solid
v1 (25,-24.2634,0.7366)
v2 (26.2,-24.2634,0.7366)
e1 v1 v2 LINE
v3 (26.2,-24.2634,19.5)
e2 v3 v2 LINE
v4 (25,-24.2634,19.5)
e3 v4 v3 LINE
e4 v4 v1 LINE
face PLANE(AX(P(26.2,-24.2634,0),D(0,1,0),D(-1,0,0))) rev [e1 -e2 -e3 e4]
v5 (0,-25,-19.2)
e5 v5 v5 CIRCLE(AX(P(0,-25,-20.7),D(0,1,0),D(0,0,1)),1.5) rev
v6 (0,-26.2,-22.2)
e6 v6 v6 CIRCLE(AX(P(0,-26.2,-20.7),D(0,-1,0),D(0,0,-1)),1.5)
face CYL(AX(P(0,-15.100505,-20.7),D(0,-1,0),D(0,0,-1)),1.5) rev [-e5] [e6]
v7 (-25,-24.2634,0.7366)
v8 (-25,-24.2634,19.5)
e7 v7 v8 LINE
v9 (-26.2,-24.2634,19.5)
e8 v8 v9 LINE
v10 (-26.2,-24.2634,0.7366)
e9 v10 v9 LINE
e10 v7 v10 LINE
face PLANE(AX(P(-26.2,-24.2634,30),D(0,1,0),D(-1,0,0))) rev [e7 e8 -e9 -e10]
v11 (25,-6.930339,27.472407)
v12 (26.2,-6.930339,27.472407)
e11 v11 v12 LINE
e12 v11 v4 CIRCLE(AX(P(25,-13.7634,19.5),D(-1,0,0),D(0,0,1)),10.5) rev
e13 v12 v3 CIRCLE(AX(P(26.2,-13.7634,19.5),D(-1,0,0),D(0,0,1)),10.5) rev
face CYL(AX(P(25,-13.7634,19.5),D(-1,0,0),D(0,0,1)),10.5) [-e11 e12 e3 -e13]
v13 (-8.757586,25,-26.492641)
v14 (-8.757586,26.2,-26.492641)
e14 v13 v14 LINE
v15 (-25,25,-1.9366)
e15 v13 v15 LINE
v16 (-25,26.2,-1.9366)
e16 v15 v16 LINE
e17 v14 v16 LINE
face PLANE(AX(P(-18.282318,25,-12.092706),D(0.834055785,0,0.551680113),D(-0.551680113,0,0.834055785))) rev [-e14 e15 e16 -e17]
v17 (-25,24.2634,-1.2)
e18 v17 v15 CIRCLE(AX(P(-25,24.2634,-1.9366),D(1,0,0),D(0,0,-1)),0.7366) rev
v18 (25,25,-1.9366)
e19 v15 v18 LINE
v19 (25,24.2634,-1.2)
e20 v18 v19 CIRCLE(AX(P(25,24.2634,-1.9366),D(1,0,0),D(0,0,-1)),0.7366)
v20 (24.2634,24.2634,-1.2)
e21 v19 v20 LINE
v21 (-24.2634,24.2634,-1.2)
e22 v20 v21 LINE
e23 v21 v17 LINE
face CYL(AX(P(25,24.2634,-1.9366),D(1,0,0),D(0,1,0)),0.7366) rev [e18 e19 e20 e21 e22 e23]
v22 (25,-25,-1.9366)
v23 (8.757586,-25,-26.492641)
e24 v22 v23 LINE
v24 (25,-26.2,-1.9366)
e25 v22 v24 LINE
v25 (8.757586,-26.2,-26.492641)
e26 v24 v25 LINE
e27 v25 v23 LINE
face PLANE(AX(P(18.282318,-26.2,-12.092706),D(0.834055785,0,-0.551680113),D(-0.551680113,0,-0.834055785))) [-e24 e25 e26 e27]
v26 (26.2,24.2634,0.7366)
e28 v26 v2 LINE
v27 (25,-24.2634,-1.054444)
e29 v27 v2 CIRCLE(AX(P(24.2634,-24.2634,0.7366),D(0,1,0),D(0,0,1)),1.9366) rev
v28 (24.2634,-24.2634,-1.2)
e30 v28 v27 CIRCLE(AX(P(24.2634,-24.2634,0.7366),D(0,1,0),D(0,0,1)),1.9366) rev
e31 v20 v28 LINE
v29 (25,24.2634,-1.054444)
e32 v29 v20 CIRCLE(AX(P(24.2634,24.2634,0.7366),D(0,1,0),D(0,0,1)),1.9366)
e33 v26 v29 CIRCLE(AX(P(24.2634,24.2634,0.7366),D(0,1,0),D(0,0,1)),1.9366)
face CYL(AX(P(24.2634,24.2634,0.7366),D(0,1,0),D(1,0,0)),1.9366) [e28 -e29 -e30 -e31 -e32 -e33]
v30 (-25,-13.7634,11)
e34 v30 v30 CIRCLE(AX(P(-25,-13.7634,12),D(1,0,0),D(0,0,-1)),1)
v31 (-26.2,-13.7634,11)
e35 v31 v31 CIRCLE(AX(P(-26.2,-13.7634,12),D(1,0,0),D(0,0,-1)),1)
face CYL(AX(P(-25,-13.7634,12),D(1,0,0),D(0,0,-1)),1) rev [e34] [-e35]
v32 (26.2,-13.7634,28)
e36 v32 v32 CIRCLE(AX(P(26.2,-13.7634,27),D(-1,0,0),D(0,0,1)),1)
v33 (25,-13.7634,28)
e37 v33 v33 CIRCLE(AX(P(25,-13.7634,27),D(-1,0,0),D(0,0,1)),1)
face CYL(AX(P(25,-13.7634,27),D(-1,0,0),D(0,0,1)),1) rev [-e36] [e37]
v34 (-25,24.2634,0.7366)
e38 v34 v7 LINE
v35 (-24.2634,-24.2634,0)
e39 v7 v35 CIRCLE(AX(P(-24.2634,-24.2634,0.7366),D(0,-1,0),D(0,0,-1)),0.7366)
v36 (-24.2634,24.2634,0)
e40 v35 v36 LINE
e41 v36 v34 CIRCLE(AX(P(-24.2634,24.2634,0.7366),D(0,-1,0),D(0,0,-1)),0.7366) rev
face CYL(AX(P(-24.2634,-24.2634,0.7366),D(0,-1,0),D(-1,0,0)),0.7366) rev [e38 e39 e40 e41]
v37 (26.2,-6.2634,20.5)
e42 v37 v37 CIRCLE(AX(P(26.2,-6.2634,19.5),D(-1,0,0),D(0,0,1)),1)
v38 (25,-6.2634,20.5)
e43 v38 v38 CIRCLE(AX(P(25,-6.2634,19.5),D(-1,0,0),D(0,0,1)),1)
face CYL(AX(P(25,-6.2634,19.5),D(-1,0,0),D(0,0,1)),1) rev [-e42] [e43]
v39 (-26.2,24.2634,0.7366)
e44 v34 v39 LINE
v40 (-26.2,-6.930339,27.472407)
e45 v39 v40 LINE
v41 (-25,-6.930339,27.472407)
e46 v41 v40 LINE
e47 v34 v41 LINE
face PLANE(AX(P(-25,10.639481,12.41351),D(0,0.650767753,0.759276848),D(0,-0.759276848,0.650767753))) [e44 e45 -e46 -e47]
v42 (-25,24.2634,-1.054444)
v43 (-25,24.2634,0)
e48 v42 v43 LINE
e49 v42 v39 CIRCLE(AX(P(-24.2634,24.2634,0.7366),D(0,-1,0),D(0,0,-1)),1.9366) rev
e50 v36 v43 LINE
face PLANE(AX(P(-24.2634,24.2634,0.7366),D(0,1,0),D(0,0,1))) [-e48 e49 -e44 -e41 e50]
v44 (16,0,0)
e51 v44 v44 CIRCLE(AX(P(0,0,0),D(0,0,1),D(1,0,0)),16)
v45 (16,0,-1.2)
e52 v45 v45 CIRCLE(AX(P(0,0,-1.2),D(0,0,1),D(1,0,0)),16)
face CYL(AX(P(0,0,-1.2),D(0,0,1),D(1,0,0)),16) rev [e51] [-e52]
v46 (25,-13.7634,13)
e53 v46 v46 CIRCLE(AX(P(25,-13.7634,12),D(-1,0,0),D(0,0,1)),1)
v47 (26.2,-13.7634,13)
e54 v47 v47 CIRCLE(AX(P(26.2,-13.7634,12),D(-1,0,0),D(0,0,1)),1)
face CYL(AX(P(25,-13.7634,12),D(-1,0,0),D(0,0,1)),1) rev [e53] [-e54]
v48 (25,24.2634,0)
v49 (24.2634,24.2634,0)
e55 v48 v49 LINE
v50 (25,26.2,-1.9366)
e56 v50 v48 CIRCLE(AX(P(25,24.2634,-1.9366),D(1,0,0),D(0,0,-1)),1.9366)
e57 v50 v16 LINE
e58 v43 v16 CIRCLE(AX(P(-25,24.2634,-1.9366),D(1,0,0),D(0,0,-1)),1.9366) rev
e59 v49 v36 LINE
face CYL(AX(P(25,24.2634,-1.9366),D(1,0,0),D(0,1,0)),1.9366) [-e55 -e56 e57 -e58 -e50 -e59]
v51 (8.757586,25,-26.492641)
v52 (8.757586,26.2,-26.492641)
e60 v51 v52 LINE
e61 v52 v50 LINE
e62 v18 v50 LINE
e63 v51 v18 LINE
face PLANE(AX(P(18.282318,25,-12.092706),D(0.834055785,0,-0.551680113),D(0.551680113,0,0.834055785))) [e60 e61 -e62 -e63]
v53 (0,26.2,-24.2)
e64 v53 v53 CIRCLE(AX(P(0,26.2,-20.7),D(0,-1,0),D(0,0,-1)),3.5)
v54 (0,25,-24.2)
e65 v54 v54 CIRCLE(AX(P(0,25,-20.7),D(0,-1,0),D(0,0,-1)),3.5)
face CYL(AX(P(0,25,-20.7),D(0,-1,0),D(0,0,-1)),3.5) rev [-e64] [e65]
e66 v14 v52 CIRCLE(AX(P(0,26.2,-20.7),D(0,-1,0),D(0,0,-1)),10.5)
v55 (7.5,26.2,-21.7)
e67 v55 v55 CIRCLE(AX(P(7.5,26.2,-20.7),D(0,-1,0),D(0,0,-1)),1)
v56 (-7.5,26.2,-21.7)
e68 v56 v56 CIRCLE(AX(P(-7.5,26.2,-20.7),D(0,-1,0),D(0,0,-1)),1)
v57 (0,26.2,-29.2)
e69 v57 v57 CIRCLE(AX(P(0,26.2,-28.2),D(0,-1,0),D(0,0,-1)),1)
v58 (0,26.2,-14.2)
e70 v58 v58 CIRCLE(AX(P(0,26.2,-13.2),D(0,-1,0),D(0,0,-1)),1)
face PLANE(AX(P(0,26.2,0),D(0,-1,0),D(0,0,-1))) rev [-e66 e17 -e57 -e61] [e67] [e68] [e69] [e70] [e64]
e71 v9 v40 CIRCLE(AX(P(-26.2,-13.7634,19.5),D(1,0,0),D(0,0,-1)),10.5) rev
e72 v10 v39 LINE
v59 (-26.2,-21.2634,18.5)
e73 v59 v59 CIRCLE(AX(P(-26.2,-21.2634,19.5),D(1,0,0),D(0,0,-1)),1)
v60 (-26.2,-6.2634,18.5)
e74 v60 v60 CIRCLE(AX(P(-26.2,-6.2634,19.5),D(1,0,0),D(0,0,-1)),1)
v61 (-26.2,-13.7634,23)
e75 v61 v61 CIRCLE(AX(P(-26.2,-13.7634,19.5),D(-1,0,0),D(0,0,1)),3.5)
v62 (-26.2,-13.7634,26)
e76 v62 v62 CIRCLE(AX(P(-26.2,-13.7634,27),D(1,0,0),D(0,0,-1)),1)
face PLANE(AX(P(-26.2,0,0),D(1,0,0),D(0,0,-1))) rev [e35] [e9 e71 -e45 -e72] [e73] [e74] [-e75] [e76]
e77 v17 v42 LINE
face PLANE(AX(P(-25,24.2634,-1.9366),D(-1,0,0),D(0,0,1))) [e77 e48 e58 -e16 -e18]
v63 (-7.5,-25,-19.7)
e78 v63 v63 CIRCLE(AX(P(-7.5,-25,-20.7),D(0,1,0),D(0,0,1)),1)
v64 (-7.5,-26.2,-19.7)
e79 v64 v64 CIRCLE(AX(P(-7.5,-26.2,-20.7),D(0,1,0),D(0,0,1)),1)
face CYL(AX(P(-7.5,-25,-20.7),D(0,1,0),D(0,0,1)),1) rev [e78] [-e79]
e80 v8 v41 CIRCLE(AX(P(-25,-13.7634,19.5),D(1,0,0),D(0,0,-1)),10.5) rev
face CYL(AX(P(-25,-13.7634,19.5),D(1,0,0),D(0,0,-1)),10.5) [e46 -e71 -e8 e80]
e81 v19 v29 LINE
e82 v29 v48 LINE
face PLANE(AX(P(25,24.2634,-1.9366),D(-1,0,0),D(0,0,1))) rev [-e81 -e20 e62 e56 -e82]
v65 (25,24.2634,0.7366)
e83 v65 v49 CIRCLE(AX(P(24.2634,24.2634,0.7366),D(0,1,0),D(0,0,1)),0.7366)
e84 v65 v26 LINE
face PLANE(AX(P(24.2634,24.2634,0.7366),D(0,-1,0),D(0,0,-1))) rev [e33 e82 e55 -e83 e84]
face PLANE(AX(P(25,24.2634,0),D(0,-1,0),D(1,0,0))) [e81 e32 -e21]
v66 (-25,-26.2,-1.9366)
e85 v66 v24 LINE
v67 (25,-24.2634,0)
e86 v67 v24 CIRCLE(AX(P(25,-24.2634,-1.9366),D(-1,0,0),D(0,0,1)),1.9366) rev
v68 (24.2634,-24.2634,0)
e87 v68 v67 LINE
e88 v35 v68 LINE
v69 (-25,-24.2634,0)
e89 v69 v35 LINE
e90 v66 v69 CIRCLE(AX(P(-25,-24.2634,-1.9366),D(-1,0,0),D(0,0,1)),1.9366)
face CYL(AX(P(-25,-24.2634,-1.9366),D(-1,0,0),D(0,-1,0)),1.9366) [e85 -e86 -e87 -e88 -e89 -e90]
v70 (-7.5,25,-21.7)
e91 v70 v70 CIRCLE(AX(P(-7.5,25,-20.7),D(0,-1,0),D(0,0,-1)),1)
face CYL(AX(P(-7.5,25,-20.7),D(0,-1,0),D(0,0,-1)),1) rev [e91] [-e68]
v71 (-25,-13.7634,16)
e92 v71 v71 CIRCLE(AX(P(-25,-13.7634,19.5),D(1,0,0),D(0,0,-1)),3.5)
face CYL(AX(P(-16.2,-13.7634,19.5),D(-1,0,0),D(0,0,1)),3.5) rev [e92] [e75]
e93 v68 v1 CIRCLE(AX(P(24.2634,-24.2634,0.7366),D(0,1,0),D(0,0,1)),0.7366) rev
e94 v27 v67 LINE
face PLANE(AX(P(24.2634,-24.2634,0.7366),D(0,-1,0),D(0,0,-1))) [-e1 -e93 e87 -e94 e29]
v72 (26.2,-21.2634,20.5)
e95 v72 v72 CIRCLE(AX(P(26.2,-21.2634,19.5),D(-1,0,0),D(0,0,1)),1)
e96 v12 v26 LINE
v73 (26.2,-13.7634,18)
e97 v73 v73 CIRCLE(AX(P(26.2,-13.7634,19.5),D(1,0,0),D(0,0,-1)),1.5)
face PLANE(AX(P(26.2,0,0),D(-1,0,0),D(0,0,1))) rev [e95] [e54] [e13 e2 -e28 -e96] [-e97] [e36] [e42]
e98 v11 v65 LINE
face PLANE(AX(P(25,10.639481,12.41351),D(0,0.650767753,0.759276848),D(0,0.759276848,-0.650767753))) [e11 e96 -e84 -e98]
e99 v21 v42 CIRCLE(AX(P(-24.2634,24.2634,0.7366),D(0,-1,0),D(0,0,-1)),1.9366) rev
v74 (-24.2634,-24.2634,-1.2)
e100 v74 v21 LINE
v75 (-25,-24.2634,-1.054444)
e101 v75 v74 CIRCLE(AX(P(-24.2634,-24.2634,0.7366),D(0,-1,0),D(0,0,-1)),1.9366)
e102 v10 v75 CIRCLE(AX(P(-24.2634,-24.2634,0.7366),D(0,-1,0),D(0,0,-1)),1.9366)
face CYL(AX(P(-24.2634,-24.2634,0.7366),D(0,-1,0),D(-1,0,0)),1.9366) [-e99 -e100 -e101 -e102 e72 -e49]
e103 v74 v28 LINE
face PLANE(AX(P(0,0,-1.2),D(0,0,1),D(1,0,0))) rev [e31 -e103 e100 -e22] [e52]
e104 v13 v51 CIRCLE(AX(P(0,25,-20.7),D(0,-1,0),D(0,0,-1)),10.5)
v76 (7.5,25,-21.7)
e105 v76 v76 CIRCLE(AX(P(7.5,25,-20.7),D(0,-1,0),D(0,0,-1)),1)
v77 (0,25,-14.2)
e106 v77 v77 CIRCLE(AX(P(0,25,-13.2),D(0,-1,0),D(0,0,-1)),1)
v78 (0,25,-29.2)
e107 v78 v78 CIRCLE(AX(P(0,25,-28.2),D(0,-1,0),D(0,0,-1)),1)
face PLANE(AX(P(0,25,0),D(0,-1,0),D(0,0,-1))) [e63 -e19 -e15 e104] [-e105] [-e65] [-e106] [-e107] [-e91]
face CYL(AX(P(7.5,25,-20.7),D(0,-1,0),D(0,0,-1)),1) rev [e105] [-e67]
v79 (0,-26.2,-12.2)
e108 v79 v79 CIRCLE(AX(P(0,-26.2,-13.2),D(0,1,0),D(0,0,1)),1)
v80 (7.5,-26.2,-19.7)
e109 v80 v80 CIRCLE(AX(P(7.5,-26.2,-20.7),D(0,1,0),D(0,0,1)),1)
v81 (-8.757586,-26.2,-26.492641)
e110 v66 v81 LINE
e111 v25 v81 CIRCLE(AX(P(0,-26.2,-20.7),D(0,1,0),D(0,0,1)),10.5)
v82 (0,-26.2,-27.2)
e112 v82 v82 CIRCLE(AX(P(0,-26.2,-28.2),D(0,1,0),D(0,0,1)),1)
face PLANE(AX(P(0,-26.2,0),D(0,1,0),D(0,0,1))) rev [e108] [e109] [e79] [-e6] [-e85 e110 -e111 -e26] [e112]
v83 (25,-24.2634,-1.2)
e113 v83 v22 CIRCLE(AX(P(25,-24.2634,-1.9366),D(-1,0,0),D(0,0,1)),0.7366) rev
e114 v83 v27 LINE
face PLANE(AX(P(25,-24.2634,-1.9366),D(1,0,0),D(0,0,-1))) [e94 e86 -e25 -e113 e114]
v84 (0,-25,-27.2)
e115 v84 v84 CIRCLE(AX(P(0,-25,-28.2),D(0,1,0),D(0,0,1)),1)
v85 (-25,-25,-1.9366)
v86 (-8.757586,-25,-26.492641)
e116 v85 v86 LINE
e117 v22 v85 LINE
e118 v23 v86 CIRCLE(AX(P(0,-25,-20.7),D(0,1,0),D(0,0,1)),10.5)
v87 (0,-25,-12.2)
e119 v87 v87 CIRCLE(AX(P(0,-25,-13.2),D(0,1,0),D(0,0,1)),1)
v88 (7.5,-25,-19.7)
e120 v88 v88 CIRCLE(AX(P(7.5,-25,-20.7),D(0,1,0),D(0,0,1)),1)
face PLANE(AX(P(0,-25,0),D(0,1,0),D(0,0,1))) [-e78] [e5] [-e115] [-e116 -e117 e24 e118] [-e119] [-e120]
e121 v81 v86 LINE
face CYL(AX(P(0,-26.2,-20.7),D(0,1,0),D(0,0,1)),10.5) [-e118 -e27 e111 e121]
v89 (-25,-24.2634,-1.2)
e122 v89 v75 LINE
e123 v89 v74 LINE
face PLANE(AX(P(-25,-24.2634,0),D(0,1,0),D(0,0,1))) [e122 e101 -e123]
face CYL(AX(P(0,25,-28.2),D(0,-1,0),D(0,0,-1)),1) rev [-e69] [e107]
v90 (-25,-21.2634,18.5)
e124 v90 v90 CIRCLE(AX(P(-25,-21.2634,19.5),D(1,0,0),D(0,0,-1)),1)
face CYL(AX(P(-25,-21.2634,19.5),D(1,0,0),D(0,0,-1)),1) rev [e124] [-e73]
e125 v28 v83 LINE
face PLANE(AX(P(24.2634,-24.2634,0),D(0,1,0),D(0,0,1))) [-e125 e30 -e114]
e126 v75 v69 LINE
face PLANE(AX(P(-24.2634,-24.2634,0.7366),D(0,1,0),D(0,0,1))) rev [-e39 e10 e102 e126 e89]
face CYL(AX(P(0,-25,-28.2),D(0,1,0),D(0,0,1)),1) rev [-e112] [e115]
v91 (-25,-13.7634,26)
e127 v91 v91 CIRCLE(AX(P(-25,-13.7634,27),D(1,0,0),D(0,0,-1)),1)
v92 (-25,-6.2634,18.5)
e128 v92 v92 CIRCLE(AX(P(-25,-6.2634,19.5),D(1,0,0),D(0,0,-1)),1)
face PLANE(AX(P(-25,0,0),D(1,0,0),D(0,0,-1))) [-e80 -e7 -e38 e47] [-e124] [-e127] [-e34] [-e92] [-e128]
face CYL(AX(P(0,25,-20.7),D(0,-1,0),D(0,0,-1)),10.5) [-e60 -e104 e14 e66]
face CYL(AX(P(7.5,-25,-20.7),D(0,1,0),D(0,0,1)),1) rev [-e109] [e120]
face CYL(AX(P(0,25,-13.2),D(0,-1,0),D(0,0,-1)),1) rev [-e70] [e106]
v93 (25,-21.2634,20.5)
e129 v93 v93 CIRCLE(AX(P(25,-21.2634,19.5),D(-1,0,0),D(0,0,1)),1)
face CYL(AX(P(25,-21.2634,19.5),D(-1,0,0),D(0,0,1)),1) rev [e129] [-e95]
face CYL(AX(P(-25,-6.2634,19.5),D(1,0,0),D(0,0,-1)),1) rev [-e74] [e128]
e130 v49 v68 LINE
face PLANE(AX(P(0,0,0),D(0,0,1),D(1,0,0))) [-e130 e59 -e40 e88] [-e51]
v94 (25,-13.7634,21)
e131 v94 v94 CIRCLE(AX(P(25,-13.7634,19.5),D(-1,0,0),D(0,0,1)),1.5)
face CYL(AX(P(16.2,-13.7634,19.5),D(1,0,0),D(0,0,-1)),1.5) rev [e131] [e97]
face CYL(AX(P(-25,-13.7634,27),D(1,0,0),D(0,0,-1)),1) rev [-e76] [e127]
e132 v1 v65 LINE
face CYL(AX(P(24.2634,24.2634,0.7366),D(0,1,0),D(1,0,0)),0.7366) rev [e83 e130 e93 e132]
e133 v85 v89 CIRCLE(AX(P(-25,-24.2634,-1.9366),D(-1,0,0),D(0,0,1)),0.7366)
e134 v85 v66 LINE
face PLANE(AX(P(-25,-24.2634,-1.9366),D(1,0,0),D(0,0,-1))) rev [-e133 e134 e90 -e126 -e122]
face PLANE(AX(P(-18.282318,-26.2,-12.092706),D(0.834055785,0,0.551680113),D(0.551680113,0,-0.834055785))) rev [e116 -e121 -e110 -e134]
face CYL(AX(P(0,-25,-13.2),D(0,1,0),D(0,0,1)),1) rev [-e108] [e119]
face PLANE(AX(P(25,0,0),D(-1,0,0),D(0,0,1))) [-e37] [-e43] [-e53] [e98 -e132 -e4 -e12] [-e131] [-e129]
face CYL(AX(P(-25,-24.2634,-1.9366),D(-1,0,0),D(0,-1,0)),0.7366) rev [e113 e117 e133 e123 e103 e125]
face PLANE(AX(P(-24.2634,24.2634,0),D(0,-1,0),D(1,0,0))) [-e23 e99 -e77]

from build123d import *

# Parameters (mm, degrees)
SKETCH_1_W                         = 50
SKETCH_1_H                         = 50
SKETCH_1_R                         = 16
SM_BASE_FLANGE_1_DEPTH             = 1.2
SM_EDGE_FLANGE_1_STRIP_W           = 6.2732
SM_EDGE_FLANGE_1_STRIP_H           = 1.2
SM_EDGE_FLANGE_1_STRIP_CUT_DEPTH   = 50
SM_EDGE_FLANGE_1_STRIP_2_W         = 6.2732
SM_EDGE_FLANGE_1_STRIP_2_H         = 1.2
SM_EDGE_FLANGE_1_STRIP_CUT_2_DEPTH = 50
SM_EDGE_FLANGE_1_DEPTH             = 50
SM_EDGE_FLANGE_1_BEND_DEPTH        = 50
SM_EDGE_FLANGE_2_STRIP_W           = 6.2732
SM_EDGE_FLANGE_2_STRIP_H           = 1.2
SM_EDGE_FLANGE_2_STRIP_CUT_DEPTH   = 48.5268
SM_EDGE_FLANGE_2_STRIP_2_W         = 6.2732
SM_EDGE_FLANGE_2_STRIP_2_H         = 1.2
SM_EDGE_FLANGE_2_STRIP_CUT_2_DEPTH = 48.5268
SM_EDGE_FLANGE_2_DEPTH             = 48.5268
SM_EDGE_FLANGE_2_BEND_DEPTH        = 48.5268
SKETCH_23_R                        = 1
CUT_EXTRUDE_1_DEPTH                = 98
EXTRUDE_START                      = -1.2
SKETCH_30_R                        = 3.5
SKETCH_30_R_2                      = 1.5
EXTRUDE_1_DEPTH                    = 1.2
SKETCH_40_R                        = 1
CUT_EXTRUDE_2_DEPTH                = 67.374995292
SKETCH_40_3_R                      = 1.5
CUT_EXTRUDE_3_DEPTH                = 10
SKETCH_45_R                        = 3.5
CUT_EXTRUDE_4_DEPTH                = 10


# Sheet-metal steps are written as plain solids
with BuildPart() as part:
    # Sketch 1 → 基材-凸緣1 (new body)
    with BuildSketch(Plane.XY):
        Rectangle(SKETCH_1_W, SKETCH_1_H)
        Circle(SKETCH_1_R, mode=Mode.SUBTRACT)
    extrude(amount=-SM_BASE_FLANGE_1_DEPTH)

    # 邊線-凸緣1 strip (across the edge) → 邊線-凸緣1 strip cut (cut)
    with BuildSketch(Plane(origin=(-25, 25, -1.2), x_dir=(0, -1, 0), z_dir=(1, 0, 0))):
        with Locations((-2.4, -0.6)):
            Rectangle(SM_EDGE_FLANGE_1_STRIP_W, SM_EDGE_FLANGE_1_STRIP_H)
    extrude(amount=SM_EDGE_FLANGE_1_STRIP_CUT_DEPTH, mode=Mode.SUBTRACT)

    # 邊線-凸緣1 strip 2 (across the edge) → 邊線-凸緣1 strip cut 2 (cut)
    with BuildSketch(Plane(origin=(25, -25, -1.2), x_dir=(0, 1, 0), z_dir=(-1, 0, 0))):
        with Locations((-2.4, -0.6)):
            Rectangle(SM_EDGE_FLANGE_1_STRIP_2_W, SM_EDGE_FLANGE_1_STRIP_2_H)
    extrude(amount=SM_EDGE_FLANGE_1_STRIP_CUT_2_DEPTH, mode=Mode.SUBTRACT)

    # 邊線-凸緣1 section (across the edge) → 邊線-凸緣1 (add)
    with BuildSketch(Plane(origin=(-25, 25, -1.2), x_dir=(0, -1, 0), z_dir=(1, 0, 0))):
        with BuildLine():
            Line((-1.2, 0.7366), (-1.2, 30))
            Line((-1.2, 30), (0, 30))
            Line((0, 30), (0, 0.7366))
            ThreePointArc((0, 0.7366), (0.215745145, 0.215745145), (0.7366, 0))
            Line((0.7366, 0), (0.7366, -1.2))
            ThreePointArc((0.7366, -1.2), (-0.632782992, -0.632782992), (-1.2, 0.7366))
        make_face()
    extrude(amount=SM_EDGE_FLANGE_1_DEPTH)

    # 邊線-凸緣1 section 2 (across the edge) → 邊線-凸緣1 bend (add)
    with BuildSketch(Plane(origin=(25, -25, -1.2), x_dir=(0, 1, 0), z_dir=(-1, 0, 0))):
        with BuildLine():
            Line((-1.2, 0.7366), (-1.2, 30))
            Line((-1.2, 30), (0, 30))
            Line((0, 30), (0, 0.7366))
            ThreePointArc((0, 0.7366), (0.215745145, 0.215745145), (0.7366, 0))
            Line((0.7366, 0), (0.7366, -1.2))
            ThreePointArc((0.7366, -1.2), (-0.632782992, -0.632782992), (-1.2, 0.7366))
        make_face()
    extrude(amount=SM_EDGE_FLANGE_1_BEND_DEPTH)

    # 邊線-凸緣2 strip (across the edge) → 邊線-凸緣2 strip cut (cut)
    with BuildSketch(Plane(origin=(25, -24.2634, 0), x_dir=(-1, 0, 0), z_dir=(0, 1, 0))):
        with Locations((-2.4, -0.6)):
            Rectangle(SM_EDGE_FLANGE_2_STRIP_W, SM_EDGE_FLANGE_2_STRIP_H)
    extrude(amount=SM_EDGE_FLANGE_2_STRIP_CUT_DEPTH, mode=Mode.SUBTRACT)

    # 邊線-凸緣2 strip 2 (across the edge) → 邊線-凸緣2 strip cut 2 (cut)
    with BuildSketch(Plane(origin=(-25, 24.2634, 0), x_dir=(1, 0, 0), z_dir=(0, -1, 0))):
        with Locations((-2.4, -0.6)):
            Rectangle(SM_EDGE_FLANGE_2_STRIP_2_W, SM_EDGE_FLANGE_2_STRIP_2_H)
    extrude(amount=SM_EDGE_FLANGE_2_STRIP_CUT_2_DEPTH, mode=Mode.SUBTRACT)

    # 邊線-凸緣2 section (across the edge) → 邊線-凸緣2 (add)
    with BuildSketch(Plane(origin=(25, -24.2634, 0), x_dir=(-1, 0, 0), z_dir=(0, 1, 0))):
        with BuildLine():
            Line((-1.2, 0.7366), (-1.2, 30))
            Line((-1.2, 30), (0, 30))
            Line((0, 30), (0, 0.7366))
            ThreePointArc((0, 0.7366), (0.215745145, 0.215745145), (0.7366, 0))
            Line((0.7366, 0), (0.7366, -1.2))
            ThreePointArc((0.7366, -1.2), (-0.632782992, -0.632782992), (-1.2, 0.7366))
        make_face()
    extrude(amount=SM_EDGE_FLANGE_2_DEPTH)

    # 邊線-凸緣2 section 2 (across the edge) → 邊線-凸緣2 bend (add)
    with BuildSketch(Plane(origin=(-25, 24.2634, 0), x_dir=(1, 0, 0), z_dir=(0, -1, 0))):
        with BuildLine():
            Line((-1.2, 0.7366), (-1.2, 30))
            Line((-1.2, 30), (0, 30))
            Line((0, 30), (0, 0.7366))
            ThreePointArc((0, 0.7366), (0.215745145, 0.215745145), (0.7366, 0))
            Line((0.7366, 0), (0.7366, -1.2))
            ThreePointArc((0.7366, -1.2), (-0.632782992, -0.632782992), (-1.2, 0.7366))
        make_face()
    extrude(amount=SM_EDGE_FLANGE_2_BEND_DEPTH)

    # 草圖23 → 除料-伸長1 (cut)
    with BuildSketch(Plane(origin=(0, 26.2, 0), x_dir=(1, 0, 0), z_dir=(0, 1, 0))):
        with BuildLine():
            Line((25, 31.2), (0, 31.2))
            ThreePointArc((0, 31.2), (4.971280899, 29.948587256), (8.757585745, 26.492641186))
            Line((8.757585745, 26.492641186), (25, 1.9366))
            Line((25, 1.9366), (25, 31.2))
        make_face()
        with BuildLine():
            ThreePointArc((-8.757585745, 26.492641186), (-4.971280899, 29.948587256), (0, 31.2))
            Line((0, 31.2), (-25, 31.2))
            Line((-25, 31.2), (-25, 1.9366))
            Line((-25, 1.9366), (-8.757585745, 26.492641186))
        make_face()
        with BuildLine():
            ThreePointArc((1, 28.2), (0.707106781, 28.907106781), (0, 29.2))
            Line((0, 29.2), (0, 27.2))
            ThreePointArc((0, 27.2), (0.707106781, 27.492893219), (1, 28.2))
        make_face()
        with BuildLine():
            Line((0, 27.2), (0, 29.2))
            ThreePointArc((0, 29.2), (-1, 28.2), (0, 27.2))
        make_face()
        with Locations(Location((-7.5, 20.7, 0), (0, 0, 90))):
            Circle(SKETCH_23_R)
        with Locations(Location((7.5, 20.7, 0), (0, 0, 90))):
            Circle(SKETCH_23_R)
        with BuildLine():
            ThreePointArc((1, 13.2), (0.707106781, 13.907106781), (0, 14.2))
            Line((0, 14.2), (0, 12.2))
            ThreePointArc((0, 12.2), (0.707106781, 12.492893219), (1, 13.2))
        make_face()
        with BuildLine():
            Line((0, 12.2), (0, 14.2))
            ThreePointArc((0, 14.2), (-1, 13.2), (0, 12.2))
        make_face()
        with BuildLine():
            ThreePointArc((3.5, 20.7), (2.474873734, 23.174873734), (0, 24.2))
            Line((0, 24.2), (0, 17.2))
            ThreePointArc((0, 17.2), (2.474873734, 18.225126266), (3.5, 20.7))
        make_face()
        with BuildLine():
            Line((0, 17.2), (0, 24.2))
            ThreePointArc((0, 24.2), (-3.5, 20.7), (0, 17.2))
        make_face()
    extrude(amount=-CUT_EXTRUDE_1_DEPTH, mode=Mode.SUBTRACT)

    # 草圖30 → 填料-伸長1 (add)
    with BuildSketch(Plane.XZ.offset(26.2).offset(EXTRUDE_START)):
        with Locations(Location((0, -20.7, 0), (0, 0, 270))):
            Circle(SKETCH_30_R)
        with Locations(Location((0, -20.7, 0), (0, 0, 270))):
            Circle(SKETCH_30_R_2, mode=Mode.SUBTRACT)
    extrude(amount=EXTRUDE_1_DEPTH)

    # 草圖40 → 除料-伸長2 (cut, through all)
    with BuildSketch(Plane(origin=(26.2, 0, 0), x_dir=(0, 0, -1), z_dir=(1, 0, 0))):
        with BuildLine():
            Line((-27.472406899, -6.93033859), (-0.7366, 24.2634))
            Line((-0.7366, 24.2634), (-30, 24.2634))
            Line((-30, 24.2634), (-30, -13.763399983))
            ThreePointArc((-30, -13.763399983), (-29.347849317, -10.12061757), (-27.472406899, -6.93033859))
        make_face()
        with BuildLine():
            ThreePointArc((-19.5, -24.2634), (-26.924621208, -21.188021196), (-30, -13.763399983))
            Line((-30, -13.763399983), (-30, -24.2634))
            Line((-30, -24.2634), (-19.5, -24.2634))
        make_face()
        with Locations(Location((-19.5, -6.2634, 0), (0, 0, 180))):
            Circle(SKETCH_40_R)
        with Locations(Location((-12, -13.7634, 0), (0, 0, 180))):
            Circle(SKETCH_40_R)
        with Locations(Location((-19.5, -21.2634, 0), (0, 0, 180))):
            Circle(SKETCH_40_R)
        with Locations(Location((-27, -13.7634, 0), (0, 0, 180))):
            Circle(SKETCH_40_R)
    extrude(amount=-CUT_EXTRUDE_2_DEPTH, mode=Mode.SUBTRACT)

    # 草圖40<3> → 除料-伸長3 (cut)
    with BuildSketch(Plane(origin=(26.2, 0, 0), x_dir=(0, 0, -1), z_dir=(1, 0, 0))):
        with Locations((-19.5, -13.7634)):
            Circle(SKETCH_40_3_R)
    extrude(amount=-CUT_EXTRUDE_3_DEPTH, mode=Mode.SUBTRACT)

    # 草圖45 → 除料-伸長4 (cut)
    with BuildSketch(Plane.ZY.offset(26.2)):
        with Locations((19.5, -13.7634)):
            Circle(SKETCH_45_R)
    extrude(amount=-CUT_EXTRUDE_4_DEPTH, mode=Mode.SUBTRACT)


solid = part.part
